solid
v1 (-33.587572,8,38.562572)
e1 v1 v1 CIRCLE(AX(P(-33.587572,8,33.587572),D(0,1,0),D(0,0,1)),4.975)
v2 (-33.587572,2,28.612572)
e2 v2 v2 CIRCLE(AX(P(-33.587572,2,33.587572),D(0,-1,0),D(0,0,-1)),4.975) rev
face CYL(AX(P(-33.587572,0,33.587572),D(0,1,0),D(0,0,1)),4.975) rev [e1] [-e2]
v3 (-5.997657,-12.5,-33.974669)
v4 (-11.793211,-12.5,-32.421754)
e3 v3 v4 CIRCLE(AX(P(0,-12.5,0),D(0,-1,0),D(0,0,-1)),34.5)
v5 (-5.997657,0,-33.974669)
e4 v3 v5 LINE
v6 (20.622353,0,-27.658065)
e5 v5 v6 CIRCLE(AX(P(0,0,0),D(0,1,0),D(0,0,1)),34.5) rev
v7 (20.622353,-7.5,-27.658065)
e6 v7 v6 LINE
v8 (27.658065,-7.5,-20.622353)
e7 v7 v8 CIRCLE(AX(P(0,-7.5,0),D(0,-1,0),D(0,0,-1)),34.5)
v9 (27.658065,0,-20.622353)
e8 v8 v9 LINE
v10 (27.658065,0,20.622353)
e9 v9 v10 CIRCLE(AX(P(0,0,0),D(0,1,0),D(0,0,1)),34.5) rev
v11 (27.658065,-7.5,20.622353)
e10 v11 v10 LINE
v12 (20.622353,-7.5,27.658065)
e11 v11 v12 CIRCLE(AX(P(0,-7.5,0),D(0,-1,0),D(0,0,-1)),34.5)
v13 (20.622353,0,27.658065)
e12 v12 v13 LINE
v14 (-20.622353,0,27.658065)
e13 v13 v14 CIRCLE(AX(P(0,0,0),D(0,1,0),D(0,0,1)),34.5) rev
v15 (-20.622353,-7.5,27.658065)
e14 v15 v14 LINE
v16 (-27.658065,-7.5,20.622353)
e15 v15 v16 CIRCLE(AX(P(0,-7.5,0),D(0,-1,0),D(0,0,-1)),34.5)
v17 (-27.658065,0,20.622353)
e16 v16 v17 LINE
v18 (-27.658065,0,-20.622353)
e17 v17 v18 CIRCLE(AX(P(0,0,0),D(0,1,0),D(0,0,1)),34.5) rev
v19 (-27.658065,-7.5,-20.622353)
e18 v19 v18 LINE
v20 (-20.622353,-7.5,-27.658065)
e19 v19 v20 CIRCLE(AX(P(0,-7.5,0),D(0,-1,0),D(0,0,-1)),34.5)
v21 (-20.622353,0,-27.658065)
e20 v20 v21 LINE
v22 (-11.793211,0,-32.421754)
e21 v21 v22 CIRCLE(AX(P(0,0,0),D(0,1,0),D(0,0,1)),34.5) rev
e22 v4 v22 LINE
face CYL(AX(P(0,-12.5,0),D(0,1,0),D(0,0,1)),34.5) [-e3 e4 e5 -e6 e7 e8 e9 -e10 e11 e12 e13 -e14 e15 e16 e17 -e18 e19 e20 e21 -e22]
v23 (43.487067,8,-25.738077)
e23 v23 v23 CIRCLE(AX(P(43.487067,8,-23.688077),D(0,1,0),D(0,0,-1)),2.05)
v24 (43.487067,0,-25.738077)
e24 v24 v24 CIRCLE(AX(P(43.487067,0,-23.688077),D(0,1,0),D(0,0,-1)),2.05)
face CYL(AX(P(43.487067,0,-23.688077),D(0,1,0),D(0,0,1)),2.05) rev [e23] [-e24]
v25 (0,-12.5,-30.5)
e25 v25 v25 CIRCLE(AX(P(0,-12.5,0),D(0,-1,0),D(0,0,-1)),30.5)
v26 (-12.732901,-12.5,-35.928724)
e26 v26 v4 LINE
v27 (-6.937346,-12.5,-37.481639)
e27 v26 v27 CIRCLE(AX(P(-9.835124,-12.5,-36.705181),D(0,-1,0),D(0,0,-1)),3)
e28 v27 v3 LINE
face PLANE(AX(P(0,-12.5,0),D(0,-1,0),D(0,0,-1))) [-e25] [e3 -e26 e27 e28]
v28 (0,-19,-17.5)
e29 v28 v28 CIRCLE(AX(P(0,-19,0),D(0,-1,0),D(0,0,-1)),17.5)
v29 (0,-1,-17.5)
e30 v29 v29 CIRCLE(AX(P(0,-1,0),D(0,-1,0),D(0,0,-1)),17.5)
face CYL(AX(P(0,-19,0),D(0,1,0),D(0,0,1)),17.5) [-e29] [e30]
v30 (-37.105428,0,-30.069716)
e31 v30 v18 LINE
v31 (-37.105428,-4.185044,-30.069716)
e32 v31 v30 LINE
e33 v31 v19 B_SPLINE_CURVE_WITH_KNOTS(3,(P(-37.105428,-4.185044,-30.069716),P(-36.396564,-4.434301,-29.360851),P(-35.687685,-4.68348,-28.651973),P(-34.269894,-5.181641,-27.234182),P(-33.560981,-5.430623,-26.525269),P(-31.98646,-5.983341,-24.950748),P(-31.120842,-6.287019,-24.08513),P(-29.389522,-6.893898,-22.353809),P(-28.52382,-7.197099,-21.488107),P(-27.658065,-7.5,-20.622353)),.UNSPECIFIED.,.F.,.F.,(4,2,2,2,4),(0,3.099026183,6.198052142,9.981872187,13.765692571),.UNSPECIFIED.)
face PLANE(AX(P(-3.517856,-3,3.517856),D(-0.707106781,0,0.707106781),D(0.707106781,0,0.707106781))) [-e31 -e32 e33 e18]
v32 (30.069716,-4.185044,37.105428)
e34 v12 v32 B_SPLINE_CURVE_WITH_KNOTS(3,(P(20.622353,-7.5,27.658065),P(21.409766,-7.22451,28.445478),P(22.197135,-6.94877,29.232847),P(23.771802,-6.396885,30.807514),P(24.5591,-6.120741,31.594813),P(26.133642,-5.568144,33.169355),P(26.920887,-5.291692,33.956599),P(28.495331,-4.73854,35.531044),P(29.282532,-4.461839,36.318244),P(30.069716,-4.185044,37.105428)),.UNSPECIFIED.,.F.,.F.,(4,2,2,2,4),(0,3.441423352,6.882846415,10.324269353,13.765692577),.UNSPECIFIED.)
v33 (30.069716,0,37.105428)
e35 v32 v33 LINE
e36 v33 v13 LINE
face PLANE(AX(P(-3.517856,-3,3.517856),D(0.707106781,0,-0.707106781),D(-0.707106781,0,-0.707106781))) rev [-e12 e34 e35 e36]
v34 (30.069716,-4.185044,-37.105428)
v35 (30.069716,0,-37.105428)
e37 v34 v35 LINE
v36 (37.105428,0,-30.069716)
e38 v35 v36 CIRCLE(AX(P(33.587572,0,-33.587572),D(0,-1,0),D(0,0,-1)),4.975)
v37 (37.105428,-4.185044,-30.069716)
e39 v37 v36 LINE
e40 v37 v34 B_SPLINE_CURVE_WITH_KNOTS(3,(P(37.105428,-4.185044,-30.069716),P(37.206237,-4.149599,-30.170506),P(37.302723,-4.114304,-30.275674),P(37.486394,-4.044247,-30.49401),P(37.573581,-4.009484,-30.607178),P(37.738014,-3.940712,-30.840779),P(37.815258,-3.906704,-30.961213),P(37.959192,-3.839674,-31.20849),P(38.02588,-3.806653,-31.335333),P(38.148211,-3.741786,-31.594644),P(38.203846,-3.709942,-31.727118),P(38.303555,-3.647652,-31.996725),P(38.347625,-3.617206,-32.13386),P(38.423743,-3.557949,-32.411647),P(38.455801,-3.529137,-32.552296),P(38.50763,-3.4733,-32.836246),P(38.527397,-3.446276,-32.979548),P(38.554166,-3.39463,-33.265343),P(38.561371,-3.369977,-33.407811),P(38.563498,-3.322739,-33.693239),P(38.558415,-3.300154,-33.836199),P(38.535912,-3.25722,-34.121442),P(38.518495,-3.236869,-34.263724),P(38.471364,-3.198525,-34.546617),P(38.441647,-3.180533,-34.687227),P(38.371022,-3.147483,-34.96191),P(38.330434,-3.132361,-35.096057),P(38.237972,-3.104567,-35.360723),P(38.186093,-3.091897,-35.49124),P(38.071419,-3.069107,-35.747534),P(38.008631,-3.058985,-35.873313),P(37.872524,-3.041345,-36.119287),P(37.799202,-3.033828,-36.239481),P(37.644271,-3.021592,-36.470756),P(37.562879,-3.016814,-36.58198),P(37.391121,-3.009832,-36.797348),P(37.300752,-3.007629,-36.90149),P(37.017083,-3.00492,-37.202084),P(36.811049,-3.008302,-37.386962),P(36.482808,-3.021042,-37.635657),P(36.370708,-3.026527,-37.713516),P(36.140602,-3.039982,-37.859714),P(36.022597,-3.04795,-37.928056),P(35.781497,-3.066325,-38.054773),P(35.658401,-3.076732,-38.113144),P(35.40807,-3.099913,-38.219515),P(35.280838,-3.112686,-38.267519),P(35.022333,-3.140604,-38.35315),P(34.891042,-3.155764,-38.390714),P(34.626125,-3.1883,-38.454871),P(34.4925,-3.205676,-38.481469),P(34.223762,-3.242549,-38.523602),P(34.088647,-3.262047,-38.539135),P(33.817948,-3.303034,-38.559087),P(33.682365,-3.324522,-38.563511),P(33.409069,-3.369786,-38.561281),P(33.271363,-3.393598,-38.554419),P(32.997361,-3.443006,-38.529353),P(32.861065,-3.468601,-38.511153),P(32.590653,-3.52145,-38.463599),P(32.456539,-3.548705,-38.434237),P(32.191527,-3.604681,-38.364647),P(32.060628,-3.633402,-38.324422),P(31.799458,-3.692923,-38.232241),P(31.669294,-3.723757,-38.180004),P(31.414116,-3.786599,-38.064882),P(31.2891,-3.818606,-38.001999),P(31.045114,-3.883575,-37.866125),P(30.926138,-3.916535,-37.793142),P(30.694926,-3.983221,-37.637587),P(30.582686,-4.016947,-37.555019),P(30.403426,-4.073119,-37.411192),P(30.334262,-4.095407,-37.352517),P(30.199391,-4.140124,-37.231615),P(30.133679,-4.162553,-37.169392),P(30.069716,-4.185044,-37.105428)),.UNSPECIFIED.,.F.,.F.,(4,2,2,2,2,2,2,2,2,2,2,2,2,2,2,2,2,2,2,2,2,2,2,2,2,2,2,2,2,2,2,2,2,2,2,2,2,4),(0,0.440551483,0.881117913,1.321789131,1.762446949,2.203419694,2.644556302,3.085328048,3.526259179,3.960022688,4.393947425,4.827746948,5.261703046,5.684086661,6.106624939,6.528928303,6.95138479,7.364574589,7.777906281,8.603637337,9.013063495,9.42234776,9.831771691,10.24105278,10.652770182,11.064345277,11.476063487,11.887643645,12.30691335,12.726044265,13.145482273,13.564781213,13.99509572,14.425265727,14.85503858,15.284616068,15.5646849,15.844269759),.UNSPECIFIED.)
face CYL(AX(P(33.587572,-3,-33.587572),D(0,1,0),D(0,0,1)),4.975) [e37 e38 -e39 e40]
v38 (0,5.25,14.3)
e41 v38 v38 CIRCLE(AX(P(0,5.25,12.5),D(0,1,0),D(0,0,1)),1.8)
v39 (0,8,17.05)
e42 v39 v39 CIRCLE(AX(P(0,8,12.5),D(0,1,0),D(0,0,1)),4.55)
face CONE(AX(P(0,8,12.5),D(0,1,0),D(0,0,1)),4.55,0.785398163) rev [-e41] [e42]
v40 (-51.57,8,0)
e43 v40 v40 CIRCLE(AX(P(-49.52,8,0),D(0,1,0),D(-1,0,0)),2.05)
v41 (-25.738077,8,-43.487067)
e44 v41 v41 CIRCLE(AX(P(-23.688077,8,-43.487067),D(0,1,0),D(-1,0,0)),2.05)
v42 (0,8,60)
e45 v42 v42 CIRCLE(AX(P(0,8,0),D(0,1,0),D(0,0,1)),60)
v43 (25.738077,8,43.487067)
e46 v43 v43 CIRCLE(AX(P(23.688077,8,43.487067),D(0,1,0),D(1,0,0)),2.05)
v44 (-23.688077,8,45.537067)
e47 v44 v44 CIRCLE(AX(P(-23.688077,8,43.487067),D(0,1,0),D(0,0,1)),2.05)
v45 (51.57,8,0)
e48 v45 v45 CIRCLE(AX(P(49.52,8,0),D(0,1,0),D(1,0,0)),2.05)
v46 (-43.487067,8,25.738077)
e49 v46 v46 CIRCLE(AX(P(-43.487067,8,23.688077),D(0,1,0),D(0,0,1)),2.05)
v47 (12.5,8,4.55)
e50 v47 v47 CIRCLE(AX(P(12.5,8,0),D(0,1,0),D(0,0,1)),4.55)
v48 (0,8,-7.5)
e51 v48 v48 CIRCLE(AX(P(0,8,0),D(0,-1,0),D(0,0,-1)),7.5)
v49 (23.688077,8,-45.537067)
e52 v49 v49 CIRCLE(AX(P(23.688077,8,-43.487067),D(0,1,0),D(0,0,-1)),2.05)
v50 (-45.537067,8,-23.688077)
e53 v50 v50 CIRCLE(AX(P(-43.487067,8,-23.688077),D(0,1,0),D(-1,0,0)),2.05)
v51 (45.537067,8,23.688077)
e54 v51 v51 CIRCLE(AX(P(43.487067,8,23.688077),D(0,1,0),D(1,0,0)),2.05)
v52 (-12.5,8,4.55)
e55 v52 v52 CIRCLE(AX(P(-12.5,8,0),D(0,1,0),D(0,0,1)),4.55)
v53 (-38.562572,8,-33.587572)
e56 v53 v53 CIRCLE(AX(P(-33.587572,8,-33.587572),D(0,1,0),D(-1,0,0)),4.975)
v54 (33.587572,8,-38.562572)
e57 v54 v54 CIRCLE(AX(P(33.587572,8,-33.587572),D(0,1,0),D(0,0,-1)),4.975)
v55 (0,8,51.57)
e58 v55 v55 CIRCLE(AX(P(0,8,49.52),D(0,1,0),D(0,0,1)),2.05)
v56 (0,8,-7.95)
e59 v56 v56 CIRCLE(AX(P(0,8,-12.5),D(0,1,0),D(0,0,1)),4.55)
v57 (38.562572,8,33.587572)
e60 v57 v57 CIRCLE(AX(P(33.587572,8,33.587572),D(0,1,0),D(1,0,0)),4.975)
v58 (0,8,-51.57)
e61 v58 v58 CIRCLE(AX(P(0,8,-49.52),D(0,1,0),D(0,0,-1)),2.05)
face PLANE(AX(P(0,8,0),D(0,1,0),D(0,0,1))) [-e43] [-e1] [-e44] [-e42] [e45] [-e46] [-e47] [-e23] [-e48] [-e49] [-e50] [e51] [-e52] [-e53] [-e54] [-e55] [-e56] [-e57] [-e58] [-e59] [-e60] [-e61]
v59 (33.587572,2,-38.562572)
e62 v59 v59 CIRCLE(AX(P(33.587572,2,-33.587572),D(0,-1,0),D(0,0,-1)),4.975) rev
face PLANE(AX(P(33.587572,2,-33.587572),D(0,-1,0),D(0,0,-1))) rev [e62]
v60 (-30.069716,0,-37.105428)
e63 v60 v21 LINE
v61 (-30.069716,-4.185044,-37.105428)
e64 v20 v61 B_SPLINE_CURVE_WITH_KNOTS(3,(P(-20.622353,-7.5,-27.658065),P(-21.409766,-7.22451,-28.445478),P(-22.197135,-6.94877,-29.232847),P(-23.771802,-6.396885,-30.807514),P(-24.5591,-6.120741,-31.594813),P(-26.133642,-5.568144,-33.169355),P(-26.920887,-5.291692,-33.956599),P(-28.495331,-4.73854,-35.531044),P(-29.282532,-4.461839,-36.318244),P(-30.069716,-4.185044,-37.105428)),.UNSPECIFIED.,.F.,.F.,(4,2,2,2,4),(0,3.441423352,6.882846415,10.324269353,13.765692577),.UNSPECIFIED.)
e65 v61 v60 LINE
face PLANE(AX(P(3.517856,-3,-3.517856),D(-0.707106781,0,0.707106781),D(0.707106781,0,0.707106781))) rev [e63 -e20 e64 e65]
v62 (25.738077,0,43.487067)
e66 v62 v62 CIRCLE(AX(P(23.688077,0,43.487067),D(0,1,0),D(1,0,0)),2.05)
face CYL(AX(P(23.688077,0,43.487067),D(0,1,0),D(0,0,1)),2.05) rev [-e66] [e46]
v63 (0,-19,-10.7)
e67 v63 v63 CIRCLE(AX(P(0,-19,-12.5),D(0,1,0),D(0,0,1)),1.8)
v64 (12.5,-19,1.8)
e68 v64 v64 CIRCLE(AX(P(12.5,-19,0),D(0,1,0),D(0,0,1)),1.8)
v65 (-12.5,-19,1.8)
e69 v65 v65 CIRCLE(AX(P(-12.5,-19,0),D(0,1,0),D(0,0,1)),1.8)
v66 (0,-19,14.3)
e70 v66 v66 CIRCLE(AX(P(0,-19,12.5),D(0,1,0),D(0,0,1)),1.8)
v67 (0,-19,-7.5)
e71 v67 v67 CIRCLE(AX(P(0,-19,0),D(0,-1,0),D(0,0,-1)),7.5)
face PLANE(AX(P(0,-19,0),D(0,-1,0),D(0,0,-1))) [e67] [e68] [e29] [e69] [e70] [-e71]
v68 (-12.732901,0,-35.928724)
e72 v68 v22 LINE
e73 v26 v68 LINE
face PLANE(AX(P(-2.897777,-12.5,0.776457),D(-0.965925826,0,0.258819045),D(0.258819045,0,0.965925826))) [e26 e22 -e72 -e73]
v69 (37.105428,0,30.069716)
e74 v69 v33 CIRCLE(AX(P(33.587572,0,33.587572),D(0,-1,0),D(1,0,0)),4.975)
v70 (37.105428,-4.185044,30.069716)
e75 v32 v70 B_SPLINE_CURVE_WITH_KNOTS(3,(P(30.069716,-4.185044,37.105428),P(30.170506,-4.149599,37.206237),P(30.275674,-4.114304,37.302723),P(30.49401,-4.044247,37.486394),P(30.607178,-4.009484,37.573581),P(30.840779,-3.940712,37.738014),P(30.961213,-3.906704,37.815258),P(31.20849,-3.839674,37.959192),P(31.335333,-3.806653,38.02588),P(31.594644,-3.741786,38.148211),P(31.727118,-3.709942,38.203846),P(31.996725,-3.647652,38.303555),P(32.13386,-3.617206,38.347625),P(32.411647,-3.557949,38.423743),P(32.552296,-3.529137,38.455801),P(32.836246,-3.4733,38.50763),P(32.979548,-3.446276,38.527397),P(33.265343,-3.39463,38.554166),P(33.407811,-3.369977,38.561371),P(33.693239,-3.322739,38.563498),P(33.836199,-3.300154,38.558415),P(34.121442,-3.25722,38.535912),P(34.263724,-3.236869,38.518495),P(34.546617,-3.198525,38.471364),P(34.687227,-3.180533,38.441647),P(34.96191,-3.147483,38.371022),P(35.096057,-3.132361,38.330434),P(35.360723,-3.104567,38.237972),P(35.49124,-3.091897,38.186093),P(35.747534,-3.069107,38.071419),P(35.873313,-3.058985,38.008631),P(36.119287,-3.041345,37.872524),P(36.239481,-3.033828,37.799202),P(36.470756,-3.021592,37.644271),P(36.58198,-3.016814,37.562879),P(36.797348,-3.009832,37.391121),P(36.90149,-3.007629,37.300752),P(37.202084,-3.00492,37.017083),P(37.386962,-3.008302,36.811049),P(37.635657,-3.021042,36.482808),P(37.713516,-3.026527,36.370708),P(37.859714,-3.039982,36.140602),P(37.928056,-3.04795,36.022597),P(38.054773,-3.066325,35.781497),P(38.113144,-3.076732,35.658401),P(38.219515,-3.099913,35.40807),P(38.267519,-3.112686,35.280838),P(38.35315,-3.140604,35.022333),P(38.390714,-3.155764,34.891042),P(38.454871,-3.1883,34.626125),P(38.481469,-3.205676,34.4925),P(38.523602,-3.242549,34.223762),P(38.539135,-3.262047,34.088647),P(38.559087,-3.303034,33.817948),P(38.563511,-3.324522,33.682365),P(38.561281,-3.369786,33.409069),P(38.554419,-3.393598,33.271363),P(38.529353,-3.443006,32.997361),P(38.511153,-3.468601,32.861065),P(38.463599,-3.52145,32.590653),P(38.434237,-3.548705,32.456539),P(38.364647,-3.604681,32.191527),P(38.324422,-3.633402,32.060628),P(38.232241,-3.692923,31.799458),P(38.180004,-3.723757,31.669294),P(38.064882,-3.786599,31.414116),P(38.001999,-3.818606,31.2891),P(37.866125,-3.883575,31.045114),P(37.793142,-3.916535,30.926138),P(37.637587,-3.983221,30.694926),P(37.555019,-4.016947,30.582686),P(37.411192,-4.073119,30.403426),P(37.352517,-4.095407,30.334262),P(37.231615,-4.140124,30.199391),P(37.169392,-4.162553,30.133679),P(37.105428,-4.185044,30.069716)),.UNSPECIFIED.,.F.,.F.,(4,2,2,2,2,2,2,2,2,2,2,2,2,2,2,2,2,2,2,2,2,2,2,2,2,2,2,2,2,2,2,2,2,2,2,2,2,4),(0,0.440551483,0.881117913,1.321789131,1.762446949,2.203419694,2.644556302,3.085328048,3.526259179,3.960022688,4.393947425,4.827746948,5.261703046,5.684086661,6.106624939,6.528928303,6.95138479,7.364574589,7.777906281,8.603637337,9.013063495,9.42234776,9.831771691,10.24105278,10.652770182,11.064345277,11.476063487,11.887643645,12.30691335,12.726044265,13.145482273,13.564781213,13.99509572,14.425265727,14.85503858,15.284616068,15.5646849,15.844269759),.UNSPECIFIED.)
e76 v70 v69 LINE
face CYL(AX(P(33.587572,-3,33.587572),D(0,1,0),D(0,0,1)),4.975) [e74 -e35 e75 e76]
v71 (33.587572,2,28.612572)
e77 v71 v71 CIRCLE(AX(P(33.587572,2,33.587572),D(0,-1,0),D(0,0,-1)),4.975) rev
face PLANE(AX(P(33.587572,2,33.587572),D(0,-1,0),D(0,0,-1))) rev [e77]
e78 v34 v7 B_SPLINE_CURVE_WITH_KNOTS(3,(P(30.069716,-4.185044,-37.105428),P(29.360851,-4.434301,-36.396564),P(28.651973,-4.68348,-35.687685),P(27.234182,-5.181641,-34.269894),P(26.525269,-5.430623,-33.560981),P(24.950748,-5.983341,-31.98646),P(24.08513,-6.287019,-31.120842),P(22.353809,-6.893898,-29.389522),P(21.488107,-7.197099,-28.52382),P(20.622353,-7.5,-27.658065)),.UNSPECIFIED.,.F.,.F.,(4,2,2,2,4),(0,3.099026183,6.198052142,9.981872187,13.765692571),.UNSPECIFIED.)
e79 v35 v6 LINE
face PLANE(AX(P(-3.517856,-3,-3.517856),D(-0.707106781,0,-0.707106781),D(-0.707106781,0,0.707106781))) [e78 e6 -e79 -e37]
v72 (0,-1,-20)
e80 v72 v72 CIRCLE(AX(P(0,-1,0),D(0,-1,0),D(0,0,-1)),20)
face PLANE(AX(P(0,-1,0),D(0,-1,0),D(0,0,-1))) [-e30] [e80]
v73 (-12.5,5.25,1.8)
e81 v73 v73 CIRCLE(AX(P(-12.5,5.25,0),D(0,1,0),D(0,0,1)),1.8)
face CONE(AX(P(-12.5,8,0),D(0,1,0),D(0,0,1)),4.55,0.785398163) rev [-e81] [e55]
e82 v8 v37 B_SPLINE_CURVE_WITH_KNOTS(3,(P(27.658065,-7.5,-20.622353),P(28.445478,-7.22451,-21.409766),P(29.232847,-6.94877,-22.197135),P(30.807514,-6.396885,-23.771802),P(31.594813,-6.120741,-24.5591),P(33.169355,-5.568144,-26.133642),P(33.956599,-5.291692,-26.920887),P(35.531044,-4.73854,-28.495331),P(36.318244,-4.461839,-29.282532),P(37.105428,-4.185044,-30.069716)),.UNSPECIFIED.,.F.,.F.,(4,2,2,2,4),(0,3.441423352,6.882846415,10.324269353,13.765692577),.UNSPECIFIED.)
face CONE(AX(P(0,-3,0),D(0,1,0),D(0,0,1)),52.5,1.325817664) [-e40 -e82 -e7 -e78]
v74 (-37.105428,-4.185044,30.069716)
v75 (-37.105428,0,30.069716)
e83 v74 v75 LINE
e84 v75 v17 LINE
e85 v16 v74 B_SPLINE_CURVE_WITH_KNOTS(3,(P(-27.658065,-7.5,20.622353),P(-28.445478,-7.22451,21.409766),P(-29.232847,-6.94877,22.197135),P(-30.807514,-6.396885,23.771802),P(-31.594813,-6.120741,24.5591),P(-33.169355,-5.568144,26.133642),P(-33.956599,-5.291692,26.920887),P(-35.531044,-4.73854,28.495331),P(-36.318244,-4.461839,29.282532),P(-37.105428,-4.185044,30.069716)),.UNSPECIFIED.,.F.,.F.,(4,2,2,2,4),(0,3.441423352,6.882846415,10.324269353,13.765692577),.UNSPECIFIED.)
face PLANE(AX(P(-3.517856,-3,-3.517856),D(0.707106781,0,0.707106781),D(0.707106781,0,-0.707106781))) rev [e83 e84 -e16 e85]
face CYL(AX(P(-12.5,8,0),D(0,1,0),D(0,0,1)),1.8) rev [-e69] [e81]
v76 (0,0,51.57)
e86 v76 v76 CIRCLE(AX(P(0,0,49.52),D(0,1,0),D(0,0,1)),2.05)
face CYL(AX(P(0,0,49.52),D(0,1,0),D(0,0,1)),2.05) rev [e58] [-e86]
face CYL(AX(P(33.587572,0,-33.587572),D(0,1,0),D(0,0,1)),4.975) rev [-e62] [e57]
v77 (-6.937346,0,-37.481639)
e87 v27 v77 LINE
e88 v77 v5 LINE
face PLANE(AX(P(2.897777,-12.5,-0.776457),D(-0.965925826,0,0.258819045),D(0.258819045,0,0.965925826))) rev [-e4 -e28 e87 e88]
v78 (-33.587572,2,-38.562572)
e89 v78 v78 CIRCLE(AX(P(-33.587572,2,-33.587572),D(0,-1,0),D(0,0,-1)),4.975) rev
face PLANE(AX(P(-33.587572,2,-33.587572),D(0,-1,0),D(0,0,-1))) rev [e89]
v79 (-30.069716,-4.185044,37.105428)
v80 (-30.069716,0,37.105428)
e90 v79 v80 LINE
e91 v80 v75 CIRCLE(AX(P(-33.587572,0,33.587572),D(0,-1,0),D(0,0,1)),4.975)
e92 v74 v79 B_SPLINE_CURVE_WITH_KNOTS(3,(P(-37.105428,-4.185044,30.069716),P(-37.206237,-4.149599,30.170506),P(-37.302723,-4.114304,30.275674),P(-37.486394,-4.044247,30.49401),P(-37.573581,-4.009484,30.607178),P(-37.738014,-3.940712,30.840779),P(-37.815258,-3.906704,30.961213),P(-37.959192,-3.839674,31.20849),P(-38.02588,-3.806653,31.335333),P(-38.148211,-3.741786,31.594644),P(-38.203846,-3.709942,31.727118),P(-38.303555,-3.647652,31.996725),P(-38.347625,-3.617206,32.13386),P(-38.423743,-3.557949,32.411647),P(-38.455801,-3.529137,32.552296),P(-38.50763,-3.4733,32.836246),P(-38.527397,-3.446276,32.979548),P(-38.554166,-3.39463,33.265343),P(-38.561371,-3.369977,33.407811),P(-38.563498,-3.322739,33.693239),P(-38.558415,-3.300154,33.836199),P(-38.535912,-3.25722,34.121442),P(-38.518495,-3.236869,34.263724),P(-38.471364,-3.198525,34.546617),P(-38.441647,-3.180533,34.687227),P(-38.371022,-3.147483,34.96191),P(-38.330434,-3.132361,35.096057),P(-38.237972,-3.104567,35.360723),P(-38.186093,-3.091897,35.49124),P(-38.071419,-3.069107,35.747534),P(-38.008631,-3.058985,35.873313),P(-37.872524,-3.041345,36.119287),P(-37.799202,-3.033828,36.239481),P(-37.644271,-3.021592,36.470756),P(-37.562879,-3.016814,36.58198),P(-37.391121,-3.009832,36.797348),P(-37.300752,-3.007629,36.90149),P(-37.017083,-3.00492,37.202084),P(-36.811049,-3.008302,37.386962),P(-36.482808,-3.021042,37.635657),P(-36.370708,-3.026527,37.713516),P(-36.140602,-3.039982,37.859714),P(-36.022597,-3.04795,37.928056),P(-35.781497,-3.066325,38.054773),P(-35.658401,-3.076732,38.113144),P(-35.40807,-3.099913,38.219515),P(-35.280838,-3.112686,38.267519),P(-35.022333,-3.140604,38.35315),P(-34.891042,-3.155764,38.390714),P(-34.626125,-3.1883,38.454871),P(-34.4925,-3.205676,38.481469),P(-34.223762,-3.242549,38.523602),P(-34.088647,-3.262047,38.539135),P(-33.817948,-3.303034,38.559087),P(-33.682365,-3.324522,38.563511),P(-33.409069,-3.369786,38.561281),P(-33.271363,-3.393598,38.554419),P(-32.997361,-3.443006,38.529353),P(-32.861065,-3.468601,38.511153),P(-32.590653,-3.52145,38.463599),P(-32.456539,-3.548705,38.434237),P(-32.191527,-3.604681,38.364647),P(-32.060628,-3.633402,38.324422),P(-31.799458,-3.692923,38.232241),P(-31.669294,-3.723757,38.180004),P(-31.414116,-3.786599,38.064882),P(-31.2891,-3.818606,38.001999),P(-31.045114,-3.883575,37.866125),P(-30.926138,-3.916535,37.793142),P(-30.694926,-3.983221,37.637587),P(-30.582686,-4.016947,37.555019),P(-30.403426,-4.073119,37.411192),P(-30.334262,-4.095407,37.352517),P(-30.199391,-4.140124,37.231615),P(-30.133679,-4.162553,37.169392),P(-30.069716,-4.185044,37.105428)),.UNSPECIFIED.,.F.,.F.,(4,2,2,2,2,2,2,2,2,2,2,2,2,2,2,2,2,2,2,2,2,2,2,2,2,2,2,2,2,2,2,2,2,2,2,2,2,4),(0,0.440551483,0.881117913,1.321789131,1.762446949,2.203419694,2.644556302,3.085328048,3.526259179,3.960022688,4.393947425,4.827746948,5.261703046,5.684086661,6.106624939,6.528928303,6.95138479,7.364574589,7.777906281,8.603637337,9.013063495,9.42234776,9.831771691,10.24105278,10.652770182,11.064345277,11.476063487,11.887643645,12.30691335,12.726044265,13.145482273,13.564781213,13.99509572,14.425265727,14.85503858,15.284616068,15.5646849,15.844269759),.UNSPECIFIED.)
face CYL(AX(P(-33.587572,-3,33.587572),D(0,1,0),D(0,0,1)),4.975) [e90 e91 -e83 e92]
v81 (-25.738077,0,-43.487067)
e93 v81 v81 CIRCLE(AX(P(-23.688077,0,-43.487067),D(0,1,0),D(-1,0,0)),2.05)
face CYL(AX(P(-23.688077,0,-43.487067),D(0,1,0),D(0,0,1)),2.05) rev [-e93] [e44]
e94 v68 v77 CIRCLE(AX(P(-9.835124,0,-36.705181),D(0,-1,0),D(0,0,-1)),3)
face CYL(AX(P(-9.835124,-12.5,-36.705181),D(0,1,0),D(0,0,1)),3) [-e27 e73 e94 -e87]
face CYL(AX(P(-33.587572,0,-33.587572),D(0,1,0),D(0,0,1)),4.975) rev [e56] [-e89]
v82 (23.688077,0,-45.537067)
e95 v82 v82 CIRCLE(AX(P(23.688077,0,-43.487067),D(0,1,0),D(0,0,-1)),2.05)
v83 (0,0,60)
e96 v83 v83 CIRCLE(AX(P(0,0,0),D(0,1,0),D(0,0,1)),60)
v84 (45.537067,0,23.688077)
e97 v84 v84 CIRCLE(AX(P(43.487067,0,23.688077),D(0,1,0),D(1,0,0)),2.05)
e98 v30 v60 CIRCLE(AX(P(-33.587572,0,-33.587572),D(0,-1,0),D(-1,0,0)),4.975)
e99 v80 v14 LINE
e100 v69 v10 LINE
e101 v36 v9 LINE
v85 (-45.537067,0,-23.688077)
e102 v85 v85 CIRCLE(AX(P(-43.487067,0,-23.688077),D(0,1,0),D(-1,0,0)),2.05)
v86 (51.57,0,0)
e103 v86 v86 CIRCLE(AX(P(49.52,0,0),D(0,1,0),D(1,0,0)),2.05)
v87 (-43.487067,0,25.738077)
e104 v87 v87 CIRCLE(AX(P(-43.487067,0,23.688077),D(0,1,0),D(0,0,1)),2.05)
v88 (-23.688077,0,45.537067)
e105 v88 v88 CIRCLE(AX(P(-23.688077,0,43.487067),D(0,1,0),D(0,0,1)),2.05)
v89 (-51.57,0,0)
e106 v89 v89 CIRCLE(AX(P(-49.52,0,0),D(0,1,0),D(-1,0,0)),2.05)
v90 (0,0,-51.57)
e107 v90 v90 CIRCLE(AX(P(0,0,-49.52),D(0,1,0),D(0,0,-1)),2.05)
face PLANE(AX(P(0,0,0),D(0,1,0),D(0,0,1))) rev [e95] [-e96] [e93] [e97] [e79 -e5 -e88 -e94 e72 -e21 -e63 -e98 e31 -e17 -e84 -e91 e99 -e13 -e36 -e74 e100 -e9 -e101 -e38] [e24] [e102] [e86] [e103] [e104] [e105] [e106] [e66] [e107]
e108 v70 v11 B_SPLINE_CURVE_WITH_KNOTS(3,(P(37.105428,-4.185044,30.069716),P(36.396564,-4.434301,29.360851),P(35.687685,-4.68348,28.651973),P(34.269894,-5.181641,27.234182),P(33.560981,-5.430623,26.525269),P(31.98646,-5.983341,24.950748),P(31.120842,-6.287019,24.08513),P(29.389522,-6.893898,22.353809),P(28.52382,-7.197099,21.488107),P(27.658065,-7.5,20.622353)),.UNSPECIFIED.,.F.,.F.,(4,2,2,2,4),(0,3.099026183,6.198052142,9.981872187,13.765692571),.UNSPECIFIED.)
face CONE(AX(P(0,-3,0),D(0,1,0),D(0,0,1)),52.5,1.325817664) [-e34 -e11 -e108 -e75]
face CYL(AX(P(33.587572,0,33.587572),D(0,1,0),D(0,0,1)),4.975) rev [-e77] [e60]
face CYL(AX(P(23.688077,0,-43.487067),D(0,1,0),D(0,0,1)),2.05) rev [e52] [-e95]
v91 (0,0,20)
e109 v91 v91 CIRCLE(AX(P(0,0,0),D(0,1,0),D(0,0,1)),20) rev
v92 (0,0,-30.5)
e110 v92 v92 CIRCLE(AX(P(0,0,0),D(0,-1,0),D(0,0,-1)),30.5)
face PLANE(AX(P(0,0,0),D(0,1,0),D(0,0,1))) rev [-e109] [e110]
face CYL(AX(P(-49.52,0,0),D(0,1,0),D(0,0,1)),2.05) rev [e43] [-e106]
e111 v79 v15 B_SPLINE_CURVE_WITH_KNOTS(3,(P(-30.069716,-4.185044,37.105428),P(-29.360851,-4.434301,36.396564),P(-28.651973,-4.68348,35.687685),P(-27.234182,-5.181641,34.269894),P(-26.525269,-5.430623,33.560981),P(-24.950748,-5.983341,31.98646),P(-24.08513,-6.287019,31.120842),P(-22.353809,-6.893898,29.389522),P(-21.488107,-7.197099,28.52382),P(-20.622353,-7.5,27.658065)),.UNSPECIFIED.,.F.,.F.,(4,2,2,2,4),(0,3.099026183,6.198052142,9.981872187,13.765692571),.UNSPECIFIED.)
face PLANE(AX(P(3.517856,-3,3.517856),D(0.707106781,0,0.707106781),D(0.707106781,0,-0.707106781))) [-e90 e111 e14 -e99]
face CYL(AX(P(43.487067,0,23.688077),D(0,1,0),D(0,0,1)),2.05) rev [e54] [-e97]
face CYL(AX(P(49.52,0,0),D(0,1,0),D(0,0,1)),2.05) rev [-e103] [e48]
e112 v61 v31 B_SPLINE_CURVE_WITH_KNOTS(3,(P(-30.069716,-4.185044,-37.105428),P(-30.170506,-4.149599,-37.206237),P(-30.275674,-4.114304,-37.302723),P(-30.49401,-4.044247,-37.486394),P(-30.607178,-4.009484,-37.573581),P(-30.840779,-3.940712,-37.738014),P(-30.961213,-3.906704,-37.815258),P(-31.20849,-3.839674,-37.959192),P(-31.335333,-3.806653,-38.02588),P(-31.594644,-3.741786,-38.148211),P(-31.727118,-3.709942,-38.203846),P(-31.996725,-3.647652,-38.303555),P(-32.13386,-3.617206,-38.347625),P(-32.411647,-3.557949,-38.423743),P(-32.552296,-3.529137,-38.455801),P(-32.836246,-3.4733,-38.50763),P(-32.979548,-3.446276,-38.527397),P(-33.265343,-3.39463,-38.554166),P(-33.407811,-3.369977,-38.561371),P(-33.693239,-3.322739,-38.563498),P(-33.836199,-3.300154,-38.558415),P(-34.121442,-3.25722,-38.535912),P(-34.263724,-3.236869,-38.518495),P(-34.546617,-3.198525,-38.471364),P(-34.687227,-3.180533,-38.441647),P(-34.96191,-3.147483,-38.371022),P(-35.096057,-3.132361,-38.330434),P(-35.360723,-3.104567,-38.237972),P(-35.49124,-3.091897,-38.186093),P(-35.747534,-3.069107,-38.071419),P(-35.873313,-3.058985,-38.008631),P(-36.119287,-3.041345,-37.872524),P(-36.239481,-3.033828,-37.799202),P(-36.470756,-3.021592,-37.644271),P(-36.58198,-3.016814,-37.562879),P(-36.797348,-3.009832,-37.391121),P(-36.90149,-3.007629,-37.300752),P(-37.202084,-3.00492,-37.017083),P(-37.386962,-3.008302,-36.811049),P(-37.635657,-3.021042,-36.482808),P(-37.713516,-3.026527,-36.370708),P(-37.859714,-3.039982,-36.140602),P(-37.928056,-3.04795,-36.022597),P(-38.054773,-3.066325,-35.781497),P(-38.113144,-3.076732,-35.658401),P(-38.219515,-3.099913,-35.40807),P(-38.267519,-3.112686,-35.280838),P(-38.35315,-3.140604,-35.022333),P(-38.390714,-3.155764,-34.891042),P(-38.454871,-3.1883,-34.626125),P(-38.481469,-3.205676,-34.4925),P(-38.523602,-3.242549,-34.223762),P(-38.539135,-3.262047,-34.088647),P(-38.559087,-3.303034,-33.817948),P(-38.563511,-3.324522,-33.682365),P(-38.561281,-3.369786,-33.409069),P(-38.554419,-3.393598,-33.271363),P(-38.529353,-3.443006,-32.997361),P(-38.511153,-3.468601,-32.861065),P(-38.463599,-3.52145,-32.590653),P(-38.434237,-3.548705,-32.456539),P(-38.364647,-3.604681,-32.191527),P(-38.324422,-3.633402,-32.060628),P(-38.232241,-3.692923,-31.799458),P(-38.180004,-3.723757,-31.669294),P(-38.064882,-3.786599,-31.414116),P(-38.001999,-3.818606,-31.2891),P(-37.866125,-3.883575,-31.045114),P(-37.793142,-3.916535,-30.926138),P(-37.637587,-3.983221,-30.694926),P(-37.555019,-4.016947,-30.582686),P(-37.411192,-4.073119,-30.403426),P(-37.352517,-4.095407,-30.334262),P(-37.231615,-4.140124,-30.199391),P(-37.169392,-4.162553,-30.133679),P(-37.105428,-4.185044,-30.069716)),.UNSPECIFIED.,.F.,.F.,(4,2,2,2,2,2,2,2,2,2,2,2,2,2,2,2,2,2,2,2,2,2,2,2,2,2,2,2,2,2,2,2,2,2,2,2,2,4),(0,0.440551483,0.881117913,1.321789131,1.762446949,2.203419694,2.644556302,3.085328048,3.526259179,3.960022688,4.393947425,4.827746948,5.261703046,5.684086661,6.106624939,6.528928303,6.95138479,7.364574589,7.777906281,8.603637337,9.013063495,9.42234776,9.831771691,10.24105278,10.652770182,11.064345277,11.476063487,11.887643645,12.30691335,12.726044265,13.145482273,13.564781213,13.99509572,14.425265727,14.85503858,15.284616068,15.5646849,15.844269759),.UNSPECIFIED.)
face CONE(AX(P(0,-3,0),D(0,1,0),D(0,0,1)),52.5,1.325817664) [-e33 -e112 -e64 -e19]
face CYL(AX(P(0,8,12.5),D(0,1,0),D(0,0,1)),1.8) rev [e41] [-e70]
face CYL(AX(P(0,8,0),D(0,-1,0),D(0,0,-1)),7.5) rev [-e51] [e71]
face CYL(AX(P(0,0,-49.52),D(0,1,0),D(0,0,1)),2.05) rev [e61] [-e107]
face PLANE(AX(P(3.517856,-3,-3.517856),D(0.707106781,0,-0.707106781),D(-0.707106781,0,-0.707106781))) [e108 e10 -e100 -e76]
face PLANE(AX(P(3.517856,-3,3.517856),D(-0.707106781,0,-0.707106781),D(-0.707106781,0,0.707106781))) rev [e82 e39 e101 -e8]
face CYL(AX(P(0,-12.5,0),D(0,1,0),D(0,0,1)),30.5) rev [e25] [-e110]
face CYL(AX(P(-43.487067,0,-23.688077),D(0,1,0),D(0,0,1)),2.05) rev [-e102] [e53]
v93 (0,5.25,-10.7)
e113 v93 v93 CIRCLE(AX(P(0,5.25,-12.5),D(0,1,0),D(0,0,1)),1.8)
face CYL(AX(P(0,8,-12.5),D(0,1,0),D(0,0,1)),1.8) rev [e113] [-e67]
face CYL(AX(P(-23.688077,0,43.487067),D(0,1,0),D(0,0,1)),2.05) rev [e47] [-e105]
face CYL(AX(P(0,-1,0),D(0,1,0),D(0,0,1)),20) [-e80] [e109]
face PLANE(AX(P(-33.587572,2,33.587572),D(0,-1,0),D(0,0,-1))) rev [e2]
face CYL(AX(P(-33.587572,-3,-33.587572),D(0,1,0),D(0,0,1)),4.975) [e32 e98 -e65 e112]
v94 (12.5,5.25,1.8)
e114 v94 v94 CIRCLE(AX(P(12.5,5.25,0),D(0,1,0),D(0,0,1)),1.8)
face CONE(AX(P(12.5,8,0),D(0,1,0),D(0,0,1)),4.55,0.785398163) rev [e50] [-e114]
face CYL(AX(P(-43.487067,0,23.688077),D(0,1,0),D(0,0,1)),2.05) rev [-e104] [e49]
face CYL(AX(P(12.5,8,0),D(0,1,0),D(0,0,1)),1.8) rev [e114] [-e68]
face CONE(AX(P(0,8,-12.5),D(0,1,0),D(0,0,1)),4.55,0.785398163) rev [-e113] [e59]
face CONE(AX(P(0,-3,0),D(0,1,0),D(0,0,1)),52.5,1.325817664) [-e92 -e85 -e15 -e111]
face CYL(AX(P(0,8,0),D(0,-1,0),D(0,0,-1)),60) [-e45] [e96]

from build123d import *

# Parameters (mm, degrees)
SKETCH1_R                                           = 60
BOSS_EXTRUDE1_DEPTH                                 = 8
SKETCH2_R                                           = 4.975
SKETCH2_R_2                                         = 2.05
CUT_EXTRUDE1_DEPTH                                  = 86.229103011
CIRPATTERN1_COUNT                                   = 4
SKETCH4_R                                           = 34.5
SKETCH4_R_2                                         = 30.5
BOSS_EXTRUDE2_DEPTH                                 = 12.5
SKETCH5_R                                           = 20
BOSS_EXTRUDE3_DEPTH                                 = 1
SKETCH6_R                                           = 17.5
BOSS_EXTRUDE4_DEPTH                                 = 18
SKETCH7_R                                           = 7.5
CUT_EXTRUDE2_DEPTH                                  = 90.044932478
BOSS_EXTRUDE6_START                                 = -2
SKETCH9_R                                           = 4.975
BOSS_EXTRUDE6_DEPTH                                 = 2
SKETCH10_R                                          = 4.975
BOSS_EXTRUDE7_DEPTH                                 = 3
CHAMFER2_START                                      = -3.006253442
CHAMFER2_DEPTH                                      = 0.006253442
CHAMFER2_START_2                                    = -7.5000001
CHAMFER2_2_DEPTH                                    = 4.493746658
CHAMFER2_3_ANGLE                                    = 16.582247
CIRPATTERN2_COUNT                                   = 4
CSK_FOR_M4_COUNTERSUNK_FLAT_HEAD_SCREW1_D           = 3.6
CSK_FOR_M4_COUNTERSUNK_FLAT_HEAD_SCREW1_CSINK_D     = 9.1
CSK_FOR_M4_COUNTERSUNK_FLAT_HEAD_SCREW1_CSINK_ANGLE = 90
BOSS_EXTRUDE8_DEPTH                                 = 12.5


with BuildPart() as part:
    # Sketch1 → Boss-Extrude1 (new body)
    with BuildSketch(Plane(origin=(0, 0, 0), x_dir=(1, 0, 0), z_dir=(0, 1, 0))):
        with Locations(Location((0, 0, 0), (0, 0, 270))):
            Circle(SKETCH1_R)
    extrude(amount=BOSS_EXTRUDE1_DEPTH)

    # Sketch2 → Cut-Extrude1 (cut, through all)
    with BuildSketch(Plane(origin=(0, 8, 0), x_dir=(1, 0, 0), z_dir=(0, 1, 0))):
        with Locations(Location((-33.587572106, -33.587572106, 0), (0, 0, 270))):
            Circle(SKETCH2_R)
        with Locations(Location((-43.487067043, -23.68807717, 0), (0, 0, 270))):
            Circle(SKETCH2_R_2)
        with Locations(Location((-23.68807717, -43.487067043, 0), (0, 0, 270))):
            Circle(SKETCH2_R_2)
        with Locations(Location((0, -49.52, 0), (0, 0, 270))):
            Circle(SKETCH2_R_2)
    cut_extrude1 = extrude(amount=-CUT_EXTRUDE1_DEPTH, mode=Mode.SUBTRACT)

    # CirPattern1: Cut-Extrude1 ×4 about axis
    cirpattern1_axis = Axis((0, 0, 0), (0, 1, 0))
    for i in range(1, CIRPATTERN1_COUNT):
        add(cut_extrude1.rotate(cirpattern1_axis, i * 360 / CIRPATTERN1_COUNT), mode=Mode.SUBTRACT)

    # Sketch4 → Boss-Extrude2 (add)
    with BuildSketch(Plane.XZ):
        with Locations(Location((0, 0, 0), (0, 0, 90))):
            Circle(SKETCH4_R)
        with Locations(Location((0, 0, 0), (0, 0, 270))):
            Circle(SKETCH4_R_2, mode=Mode.SUBTRACT)
    extrude(amount=BOSS_EXTRUDE2_DEPTH)

    # Sketch5 → Boss-Extrude3 (add)
    with BuildSketch(Plane.XZ):
        with Locations(Location((0, 0, 0), (0, 0, 90))):
            Circle(SKETCH5_R)
    extrude(amount=BOSS_EXTRUDE3_DEPTH)

    # Sketch6 → Boss-Extrude4 (add)
    with BuildSketch(Plane.XZ.offset(1)):
        with Locations(Location((0, 0, 0), (0, 0, 270))):
            Circle(SKETCH6_R)
    extrude(amount=BOSS_EXTRUDE4_DEPTH)

    # Sketch7 → Cut-Extrude2 (cut, through all)
    with BuildSketch(Plane.XZ.offset(19)):
        with Locations(Location((0, 0, 0), (0, 0, 270))):
            Circle(SKETCH7_R)
    extrude(amount=-CUT_EXTRUDE2_DEPTH, mode=Mode.SUBTRACT)

    # Sketch9 → Boss-Extrude6 (add)
    with BuildSketch(Plane.XZ.offset(BOSS_EXTRUDE6_START)):
        with Locations(Location((-33.587572106, -33.587572106, 0), (0, 0, 180))):
            Circle(SKETCH9_R)
        with Locations(Location((-33.587572106, 33.587572106, 0), (0, 0, 90))):
            Circle(SKETCH9_R)
        with Locations((33.587572106, 33.587572106)):
            Circle(SKETCH9_R)
        with Locations(Location((33.587572106, -33.587572106, 0), (0, 0, 270))):
            Circle(SKETCH9_R)
    extrude(amount=BOSS_EXTRUDE6_DEPTH)

    # Sketch10 → Boss-Extrude7 (add)
    with BuildSketch(Plane.XZ):
        with BuildLine():
            Line((20.6223527, -27.658065173), (30.06971587, -37.105428343))
            ThreePointArc((30.06971587, -37.105428343), (30.06971587, -30.06971587), (37.105428343, -30.06971587))
            Line((37.105428343, -30.06971587), (27.658065173, -20.6223527))
            ThreePointArc((27.658065173, -20.6223527), (24.395183951, -24.395183951), (20.6223527, -27.658065173))
        make_face()
        with Locations(Location((33.587572106, -33.587572106, 0), (0, 0, 270))):
            Circle(SKETCH10_R)
    boss_extrude7 = extrude(amount=BOSS_EXTRUDE7_DEPTH)

    # Chamfer2: read off the stored shape, not the designer's step
    # Chamfer2 outline → Chamfer2 (add)
    with BuildSketch(Plane(origin=(0, 0, 0), x_dir=(1, 0, 0), z_dir=(0, 1, 0)).offset(CHAMFER2_START)):
        with BuildLine():
            ThreePointArc((37.105428343, 30.06971587), (37.105428343, 37.105428343), (30.06971587, 37.105428343))
            Line((30.06971587, 37.105428343), (20.6223527, 27.658065173))
            ThreePointArc((20.6223527, 27.658065173), (24.395183951, 24.395183951), (27.658065173, 20.6223527))
            Line((27.658065173, 20.6223527), (37.105428343, 30.06971587))
        make_face()
    chamfer2 = extrude(amount=CHAMFER2_DEPTH)

    # Chamfer2 2 outline → Chamfer2 2 (add)
    with BuildSketch(Plane(origin=(0, 0, 0), x_dir=(1, 0, 0), z_dir=(0, 1, 0)).offset(CHAMFER2_START_2)):
        with BuildLine():
            ThreePointArc((37.105428343, 30.06971587), (37.105428343, 37.105428343), (30.06971587, 37.105428343))
            Line((30.06971587, 37.105428343), (20.6223527, 27.658065173))
            ThreePointArc((20.6223527, 27.658065173), (24.395183951, 24.395183951), (27.658065173, 20.6223527))
            Line((27.658065173, 20.6223527), (37.105428343, 30.06971587))
        make_face()
    chamfer2_2 = extrude(amount=CHAMFER2_2_DEPTH)

    # Chamfer2 3 outline → Chamfer2 3 (revolve, cut)
    with BuildSketch(Plane(origin=(0, 0, 0), x_dir=(0.801683048491221, 0, -0.597749353627273), z_dir=(0.597749353627273, 0, 0.801683048491221))):
        Polygon((52.475017897, -3.006245526), (34.5, -7.5), (52.475, -7.5000001), align=None)
    chamfer2_3 = revolve(axis=Axis((0, 0, 0), (0, 1, 0)), revolution_arc=CHAMFER2_3_ANGLE, mode=Mode.SUBTRACT)

    # CirPattern2: Boss-Extrude7, Chamfer2, Chamfer2 2, Chamfer2 3 ×4 about axis
    cirpattern2_axis = Axis((0, 0, 0), (0, 1, 0))
    add([boss_extrude7.rotate(cirpattern2_axis, i * 360 / CIRPATTERN2_COUNT) for i in range(1, CIRPATTERN2_COUNT)])
    add([chamfer2.rotate(cirpattern2_axis, i * 360 / CIRPATTERN2_COUNT) for i in range(1, CIRPATTERN2_COUNT)])
    add([chamfer2_2.rotate(cirpattern2_axis, i * 360 / CIRPATTERN2_COUNT) for i in range(1, CIRPATTERN2_COUNT)])
    add([chamfer2_3.rotate(cirpattern2_axis, i * 360 / CIRPATTERN2_COUNT) for i in range(1, CIRPATTERN2_COUNT)], mode=Mode.SUBTRACT)

    # CSK for M4 Countersunk Flat Head Screw1 (through all)
    with Locations(Plane(origin=(0, 8, -12.5), x_dir=(0, 0, 1), z_dir=(0, 1, 0))):
        with Locations((0, 0), (12.5, 12.5), (25, 0), (12.5, -12.5)):
            CounterSinkHole(CSK_FOR_M4_COUNTERSUNK_FLAT_HEAD_SCREW1_D / 2, CSK_FOR_M4_COUNTERSUNK_FLAT_HEAD_SCREW1_CSINK_D / 2, counter_sink_angle=CSK_FOR_M4_COUNTERSUNK_FLAT_HEAD_SCREW1_CSINK_ANGLE)

    # Sketch13 → Boss-Extrude8 (add)
    with BuildSketch(Plane.XZ):
        with BuildLine():
            Line((-11.79321147, -32.421754475), (-12.732901193, -35.928724264))
            ThreePointArc((-12.732901193, -35.928724264), (-10.611580849, -39.602958878), (-6.937346235, -37.481638534))
            Line((-6.937346235, -37.481638534), (-5.997656512, -33.974668745))
            ThreePointArc((-5.997656512, -33.974668745), (-8.929257056, -33.324441007), (-11.79321147, -32.421754475))
        make_face()
    extrude(amount=BOSS_EXTRUDE8_DEPTH)


solid = part.part
